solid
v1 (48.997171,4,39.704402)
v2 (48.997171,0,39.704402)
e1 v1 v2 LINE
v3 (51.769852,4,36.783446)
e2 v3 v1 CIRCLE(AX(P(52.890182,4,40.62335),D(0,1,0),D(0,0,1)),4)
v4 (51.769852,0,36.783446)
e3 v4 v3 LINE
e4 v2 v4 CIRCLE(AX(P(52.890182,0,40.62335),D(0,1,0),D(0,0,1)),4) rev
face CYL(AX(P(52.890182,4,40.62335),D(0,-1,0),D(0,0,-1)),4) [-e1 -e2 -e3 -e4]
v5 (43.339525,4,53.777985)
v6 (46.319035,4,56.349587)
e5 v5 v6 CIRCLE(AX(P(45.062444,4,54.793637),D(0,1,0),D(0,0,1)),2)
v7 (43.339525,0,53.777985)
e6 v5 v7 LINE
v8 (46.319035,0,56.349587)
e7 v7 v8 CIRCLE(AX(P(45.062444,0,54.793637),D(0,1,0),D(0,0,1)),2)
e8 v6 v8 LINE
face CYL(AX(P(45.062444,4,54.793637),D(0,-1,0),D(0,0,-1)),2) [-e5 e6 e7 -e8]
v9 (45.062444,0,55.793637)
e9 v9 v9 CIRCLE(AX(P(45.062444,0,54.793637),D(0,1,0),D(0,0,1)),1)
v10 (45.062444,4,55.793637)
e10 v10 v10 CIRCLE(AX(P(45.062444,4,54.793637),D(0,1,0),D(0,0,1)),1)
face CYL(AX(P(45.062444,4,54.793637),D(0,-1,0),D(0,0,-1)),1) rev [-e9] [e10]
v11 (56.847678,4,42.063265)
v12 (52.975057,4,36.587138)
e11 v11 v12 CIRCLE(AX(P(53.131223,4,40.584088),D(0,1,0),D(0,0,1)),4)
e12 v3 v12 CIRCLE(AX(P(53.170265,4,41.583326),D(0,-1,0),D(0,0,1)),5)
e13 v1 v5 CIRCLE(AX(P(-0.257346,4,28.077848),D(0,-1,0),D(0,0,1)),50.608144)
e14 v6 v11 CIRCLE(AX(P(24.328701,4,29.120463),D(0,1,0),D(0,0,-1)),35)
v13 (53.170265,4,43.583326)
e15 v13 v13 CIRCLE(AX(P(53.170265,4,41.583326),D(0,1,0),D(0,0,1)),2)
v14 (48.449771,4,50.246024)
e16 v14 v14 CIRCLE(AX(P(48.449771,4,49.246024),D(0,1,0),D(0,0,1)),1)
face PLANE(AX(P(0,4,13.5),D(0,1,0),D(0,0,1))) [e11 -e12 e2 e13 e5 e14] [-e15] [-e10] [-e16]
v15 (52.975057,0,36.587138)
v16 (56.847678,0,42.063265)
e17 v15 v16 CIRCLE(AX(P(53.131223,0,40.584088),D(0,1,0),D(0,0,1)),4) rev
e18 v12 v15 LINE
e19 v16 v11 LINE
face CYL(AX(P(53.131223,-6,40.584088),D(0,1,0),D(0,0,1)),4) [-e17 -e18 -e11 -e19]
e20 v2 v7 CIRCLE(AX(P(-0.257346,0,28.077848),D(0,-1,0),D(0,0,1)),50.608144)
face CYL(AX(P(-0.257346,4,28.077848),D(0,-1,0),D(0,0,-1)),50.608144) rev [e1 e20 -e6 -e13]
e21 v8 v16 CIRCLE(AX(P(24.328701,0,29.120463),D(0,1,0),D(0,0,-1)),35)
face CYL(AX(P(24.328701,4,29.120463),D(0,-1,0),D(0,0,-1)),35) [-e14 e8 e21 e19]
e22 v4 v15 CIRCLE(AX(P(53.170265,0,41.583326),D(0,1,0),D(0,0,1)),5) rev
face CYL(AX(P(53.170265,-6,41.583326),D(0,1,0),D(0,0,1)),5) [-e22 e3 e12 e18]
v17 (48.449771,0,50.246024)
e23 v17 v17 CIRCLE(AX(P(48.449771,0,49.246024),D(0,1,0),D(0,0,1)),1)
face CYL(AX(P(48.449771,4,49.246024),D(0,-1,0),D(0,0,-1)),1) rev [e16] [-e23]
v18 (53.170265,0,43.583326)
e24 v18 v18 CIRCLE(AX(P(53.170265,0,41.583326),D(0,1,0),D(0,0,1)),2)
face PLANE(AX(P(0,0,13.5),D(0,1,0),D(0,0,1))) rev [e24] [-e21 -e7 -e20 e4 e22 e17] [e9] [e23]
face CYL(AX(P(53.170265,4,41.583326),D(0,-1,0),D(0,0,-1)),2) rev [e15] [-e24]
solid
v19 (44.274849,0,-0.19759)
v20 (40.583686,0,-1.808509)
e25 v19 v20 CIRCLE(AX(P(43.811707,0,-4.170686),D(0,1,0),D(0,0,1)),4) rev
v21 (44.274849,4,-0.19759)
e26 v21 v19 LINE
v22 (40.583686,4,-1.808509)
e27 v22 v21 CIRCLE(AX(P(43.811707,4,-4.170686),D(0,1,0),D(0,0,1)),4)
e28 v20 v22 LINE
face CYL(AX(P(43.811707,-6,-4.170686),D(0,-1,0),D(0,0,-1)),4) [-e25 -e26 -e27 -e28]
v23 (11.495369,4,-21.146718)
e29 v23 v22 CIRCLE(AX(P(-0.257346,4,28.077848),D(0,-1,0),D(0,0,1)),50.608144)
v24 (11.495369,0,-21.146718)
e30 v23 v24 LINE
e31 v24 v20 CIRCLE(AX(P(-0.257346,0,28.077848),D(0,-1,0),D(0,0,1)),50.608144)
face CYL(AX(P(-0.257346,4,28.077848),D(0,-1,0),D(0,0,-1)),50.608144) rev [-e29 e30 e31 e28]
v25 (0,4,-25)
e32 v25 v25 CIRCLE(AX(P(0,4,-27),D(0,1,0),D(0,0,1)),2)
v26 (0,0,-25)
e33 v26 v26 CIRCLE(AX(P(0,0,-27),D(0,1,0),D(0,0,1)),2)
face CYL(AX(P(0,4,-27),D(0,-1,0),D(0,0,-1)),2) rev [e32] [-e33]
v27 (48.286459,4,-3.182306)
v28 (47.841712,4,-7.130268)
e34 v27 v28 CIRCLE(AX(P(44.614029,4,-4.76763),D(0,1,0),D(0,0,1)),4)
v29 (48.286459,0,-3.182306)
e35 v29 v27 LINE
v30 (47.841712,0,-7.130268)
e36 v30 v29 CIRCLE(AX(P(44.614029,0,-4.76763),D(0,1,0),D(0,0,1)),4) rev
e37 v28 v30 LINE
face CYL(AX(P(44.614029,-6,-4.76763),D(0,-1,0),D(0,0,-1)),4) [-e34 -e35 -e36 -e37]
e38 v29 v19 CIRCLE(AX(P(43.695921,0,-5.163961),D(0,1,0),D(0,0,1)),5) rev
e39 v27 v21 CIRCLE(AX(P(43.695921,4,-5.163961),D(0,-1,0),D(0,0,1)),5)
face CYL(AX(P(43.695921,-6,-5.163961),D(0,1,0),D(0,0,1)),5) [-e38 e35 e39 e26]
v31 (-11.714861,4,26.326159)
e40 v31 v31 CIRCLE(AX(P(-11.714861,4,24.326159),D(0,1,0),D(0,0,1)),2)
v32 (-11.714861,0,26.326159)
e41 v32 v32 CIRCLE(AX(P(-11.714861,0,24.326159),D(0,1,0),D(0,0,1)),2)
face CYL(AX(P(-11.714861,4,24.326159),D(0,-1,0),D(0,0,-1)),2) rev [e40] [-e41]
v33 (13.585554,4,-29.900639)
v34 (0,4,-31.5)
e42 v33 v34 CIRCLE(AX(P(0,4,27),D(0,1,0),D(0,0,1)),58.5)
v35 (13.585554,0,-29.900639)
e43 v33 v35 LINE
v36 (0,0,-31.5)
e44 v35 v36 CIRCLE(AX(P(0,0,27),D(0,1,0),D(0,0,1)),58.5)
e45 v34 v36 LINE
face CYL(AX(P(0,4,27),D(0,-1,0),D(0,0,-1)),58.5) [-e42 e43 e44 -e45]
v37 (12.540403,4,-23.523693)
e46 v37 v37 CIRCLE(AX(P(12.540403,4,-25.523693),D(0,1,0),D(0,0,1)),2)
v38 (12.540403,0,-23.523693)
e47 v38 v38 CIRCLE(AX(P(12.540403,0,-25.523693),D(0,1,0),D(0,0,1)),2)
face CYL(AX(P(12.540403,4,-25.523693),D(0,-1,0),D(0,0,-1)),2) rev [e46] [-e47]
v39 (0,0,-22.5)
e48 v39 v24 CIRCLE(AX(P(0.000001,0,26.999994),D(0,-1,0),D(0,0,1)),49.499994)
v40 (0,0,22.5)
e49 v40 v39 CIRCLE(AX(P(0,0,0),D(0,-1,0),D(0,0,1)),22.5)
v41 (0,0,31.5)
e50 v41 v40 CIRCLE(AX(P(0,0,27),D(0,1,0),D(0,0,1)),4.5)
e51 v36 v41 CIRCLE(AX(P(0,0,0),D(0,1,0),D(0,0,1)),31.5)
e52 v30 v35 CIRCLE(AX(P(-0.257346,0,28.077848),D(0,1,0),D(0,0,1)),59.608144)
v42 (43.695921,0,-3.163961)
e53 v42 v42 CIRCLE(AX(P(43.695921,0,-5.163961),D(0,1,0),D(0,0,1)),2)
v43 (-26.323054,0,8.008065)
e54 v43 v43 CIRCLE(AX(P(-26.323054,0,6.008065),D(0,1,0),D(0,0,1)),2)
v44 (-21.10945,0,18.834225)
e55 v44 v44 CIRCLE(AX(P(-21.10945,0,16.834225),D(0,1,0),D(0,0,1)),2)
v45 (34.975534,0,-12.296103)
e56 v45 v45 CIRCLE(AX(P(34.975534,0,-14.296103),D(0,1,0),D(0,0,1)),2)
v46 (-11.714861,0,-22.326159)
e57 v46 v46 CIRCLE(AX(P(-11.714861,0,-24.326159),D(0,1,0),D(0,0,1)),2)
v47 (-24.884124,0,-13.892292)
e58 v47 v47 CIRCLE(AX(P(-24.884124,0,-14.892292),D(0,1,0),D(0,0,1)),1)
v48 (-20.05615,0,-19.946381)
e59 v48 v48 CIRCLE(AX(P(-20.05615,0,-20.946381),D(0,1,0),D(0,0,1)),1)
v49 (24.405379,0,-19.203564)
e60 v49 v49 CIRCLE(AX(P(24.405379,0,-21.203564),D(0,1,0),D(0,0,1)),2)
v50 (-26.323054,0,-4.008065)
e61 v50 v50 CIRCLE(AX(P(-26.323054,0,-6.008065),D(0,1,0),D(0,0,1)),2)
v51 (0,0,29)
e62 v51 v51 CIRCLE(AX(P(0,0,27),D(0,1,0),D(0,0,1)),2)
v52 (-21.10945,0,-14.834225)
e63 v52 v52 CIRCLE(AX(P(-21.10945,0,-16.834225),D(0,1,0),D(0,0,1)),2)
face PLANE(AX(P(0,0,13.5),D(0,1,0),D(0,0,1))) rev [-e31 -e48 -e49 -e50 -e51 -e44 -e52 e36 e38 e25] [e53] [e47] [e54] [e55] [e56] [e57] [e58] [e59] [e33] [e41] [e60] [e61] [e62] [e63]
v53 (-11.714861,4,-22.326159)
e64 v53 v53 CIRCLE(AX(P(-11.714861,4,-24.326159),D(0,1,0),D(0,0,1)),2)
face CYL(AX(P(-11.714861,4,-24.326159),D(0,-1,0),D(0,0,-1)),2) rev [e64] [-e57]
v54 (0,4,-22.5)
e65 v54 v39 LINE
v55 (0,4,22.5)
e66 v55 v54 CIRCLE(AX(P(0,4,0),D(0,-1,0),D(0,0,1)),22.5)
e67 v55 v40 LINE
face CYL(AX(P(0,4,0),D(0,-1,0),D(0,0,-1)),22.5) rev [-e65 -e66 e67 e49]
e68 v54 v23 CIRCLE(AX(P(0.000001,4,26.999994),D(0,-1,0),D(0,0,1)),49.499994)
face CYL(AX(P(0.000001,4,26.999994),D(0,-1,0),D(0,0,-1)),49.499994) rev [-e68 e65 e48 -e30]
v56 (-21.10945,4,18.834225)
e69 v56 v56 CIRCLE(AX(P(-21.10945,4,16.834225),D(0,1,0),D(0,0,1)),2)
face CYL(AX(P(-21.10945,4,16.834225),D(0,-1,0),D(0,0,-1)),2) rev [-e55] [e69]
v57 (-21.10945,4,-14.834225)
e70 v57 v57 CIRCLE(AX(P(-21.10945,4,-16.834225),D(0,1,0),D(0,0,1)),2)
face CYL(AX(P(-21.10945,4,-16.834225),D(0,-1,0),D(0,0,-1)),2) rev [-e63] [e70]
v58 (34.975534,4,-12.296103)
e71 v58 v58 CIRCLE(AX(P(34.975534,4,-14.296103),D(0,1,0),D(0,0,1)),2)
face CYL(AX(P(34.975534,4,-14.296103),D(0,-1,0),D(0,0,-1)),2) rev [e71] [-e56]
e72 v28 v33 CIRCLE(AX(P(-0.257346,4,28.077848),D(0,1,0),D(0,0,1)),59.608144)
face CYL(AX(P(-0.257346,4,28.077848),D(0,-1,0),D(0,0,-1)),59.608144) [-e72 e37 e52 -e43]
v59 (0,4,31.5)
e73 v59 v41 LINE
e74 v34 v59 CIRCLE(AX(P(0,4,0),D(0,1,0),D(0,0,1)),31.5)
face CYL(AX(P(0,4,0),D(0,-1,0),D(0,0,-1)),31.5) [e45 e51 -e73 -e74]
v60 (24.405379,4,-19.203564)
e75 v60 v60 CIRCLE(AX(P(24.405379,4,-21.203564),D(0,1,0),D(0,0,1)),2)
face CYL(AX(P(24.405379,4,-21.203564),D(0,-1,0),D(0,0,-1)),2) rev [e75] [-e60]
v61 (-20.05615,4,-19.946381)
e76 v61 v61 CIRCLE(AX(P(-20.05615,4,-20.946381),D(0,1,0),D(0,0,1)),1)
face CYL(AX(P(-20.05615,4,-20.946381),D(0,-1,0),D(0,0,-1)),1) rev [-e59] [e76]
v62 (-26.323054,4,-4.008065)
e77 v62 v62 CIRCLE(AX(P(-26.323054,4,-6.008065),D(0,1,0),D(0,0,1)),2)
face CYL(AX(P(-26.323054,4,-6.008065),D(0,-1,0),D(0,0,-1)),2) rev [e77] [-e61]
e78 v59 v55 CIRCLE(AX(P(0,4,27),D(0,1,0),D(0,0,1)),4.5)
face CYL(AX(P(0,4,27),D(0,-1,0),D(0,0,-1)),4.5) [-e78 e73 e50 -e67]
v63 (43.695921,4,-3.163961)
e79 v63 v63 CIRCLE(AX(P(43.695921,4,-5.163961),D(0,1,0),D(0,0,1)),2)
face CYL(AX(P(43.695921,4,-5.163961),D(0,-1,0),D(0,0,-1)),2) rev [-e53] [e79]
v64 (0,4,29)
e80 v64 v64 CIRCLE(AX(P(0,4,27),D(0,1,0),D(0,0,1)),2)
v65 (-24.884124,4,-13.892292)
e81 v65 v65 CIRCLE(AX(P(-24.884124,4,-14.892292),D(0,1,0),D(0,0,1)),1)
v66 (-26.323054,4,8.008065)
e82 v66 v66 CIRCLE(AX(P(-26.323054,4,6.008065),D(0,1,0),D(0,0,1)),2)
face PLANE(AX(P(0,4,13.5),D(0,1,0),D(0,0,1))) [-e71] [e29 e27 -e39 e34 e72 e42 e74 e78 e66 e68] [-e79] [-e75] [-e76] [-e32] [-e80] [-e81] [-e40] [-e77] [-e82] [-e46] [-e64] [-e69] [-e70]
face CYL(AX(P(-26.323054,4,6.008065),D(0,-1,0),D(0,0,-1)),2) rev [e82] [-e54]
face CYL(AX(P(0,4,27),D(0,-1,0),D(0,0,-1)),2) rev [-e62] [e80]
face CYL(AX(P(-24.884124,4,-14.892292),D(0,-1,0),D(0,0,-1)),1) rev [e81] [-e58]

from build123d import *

# Parameters (mm, degrees)
EXTRUDE_2_OUTLINE_R   = 2
EXTRUDE_2_OUTLINE_R_2 = 1
EXTRUDE_2_DEPTH       = 4
CUT_EXTRUDE_START     = -10
CUT_EXTRUDE_3_DEPTH   = 10
FILLET_1_R            = 4
FILLET_2_R            = 4


with BuildPart() as part:
    # 凸台-拉伸2: read off the stored shape, not the designer's step
    # 凸台-拉伸2 outline → 凸台-拉伸2 (new body)
    with BuildSketch(Plane(origin=(0, 0, 0), x_dir=(1, 0, 0), z_dir=(0, 1, 0))):
        with BuildLine():
            ThreePointArc((0, -31.5), (4.5, -27), (0, -22.5))
            ThreePointArc((0, -22.5), (-22.5, 3.7e-08), (7.4e-08, 22.5))
            ThreePointArc((7.4e-08, 22.5), (5.787375943, 22.160515492), (11.49536899, 21.146718391))
            ThreePointArc((11.49536899, 21.146718391), (46.318634446, -8.282336699), (43.339524989, -53.777984924))
            ThreePointArc((43.339524989, -53.777984924), (43.755673323, -56.307687994), (46.319034695, -56.349587119))
            ThreePointArc((46.319034695, -56.349587119), (55.582439452, -44.874948294), (59.297272191, -30.603367387))
            ThreePointArc((59.297272191, -30.603367387), (47.302958929, 7.854702908), (13.58555366, 29.900639116))
            ThreePointArc((13.58555366, 29.900639116), (6.839686095, 31.09878393), (0, 31.5))
            ThreePointArc((0, 31.5), (-31.5, 0), (0, -31.5))
        make_face()
        with Locations((-11.714860956, -24.326159433)):
            Circle(EXTRUDE_2_OUTLINE_R, mode=Mode.SUBTRACT)
        with Locations((-21.109450027, -16.83422465)):
            Circle(EXTRUDE_2_OUTLINE_R, mode=Mode.SUBTRACT)
        with Locations((0, -27)):
            Circle(EXTRUDE_2_OUTLINE_R, mode=Mode.SUBTRACT)
        with Locations((45.062444179, -54.793637159)):
            Circle(EXTRUDE_2_OUTLINE_R_2, mode=Mode.SUBTRACT)
        with Locations((48.449771136, -49.246023611)):
            Circle(EXTRUDE_2_OUTLINE_R_2, mode=Mode.SUBTRACT)
        with Locations((53.170264587, -41.583325549)):
            Circle(EXTRUDE_2_OUTLINE_R, mode=Mode.SUBTRACT)
        with Locations((54.835170241, -29.39015795)):
            Circle(EXTRUDE_2_OUTLINE_R, mode=Mode.SUBTRACT)
        with Locations((53.752708813, -17.131547744)):
            Circle(EXTRUDE_2_OUTLINE_R, mode=Mode.SUBTRACT)
        with Locations((-26.323053629, -6.008065217)):
            Circle(EXTRUDE_2_OUTLINE_R, mode=Mode.SUBTRACT)
        with Locations((-26.323053629, 6.008065217)):
            Circle(EXTRUDE_2_OUTLINE_R, mode=Mode.SUBTRACT)
        with Locations((-24.884124338, 14.892291829)):
            Circle(EXTRUDE_2_OUTLINE_R_2, mode=Mode.SUBTRACT)
        with Locations((-21.109450027, 16.83422465)):
            Circle(EXTRUDE_2_OUTLINE_R, mode=Mode.SUBTRACT)
        with Locations((-20.056149569, 20.946380701)):
            Circle(EXTRUDE_2_OUTLINE_R_2, mode=Mode.SUBTRACT)
        with Locations((-11.714860956, 24.326159433)):
            Circle(EXTRUDE_2_OUTLINE_R, mode=Mode.SUBTRACT)
        with Locations((0, 27)):
            Circle(EXTRUDE_2_OUTLINE_R, mode=Mode.SUBTRACT)
        with Locations((12.540402592, 25.523692776)):
            Circle(EXTRUDE_2_OUTLINE_R, mode=Mode.SUBTRACT)
        with Locations((49.976860752, -5.418810304)):
            Circle(EXTRUDE_2_OUTLINE_R, mode=Mode.SUBTRACT)
        with Locations((43.695920975, 5.163960715)):
            Circle(EXTRUDE_2_OUTLINE_R, mode=Mode.SUBTRACT)
        with Locations((34.975533575, 14.296103059)):
            Circle(EXTRUDE_2_OUTLINE_R, mode=Mode.SUBTRACT)
        with Locations((24.405378973, 21.203563653)):
            Circle(EXTRUDE_2_OUTLINE_R, mode=Mode.SUBTRACT)
    extrude(amount=EXTRUDE_2_DEPTH)

    # 草图8 → 切除-拉伸3 (cut)
    with BuildSketch(Plane(origin=(0, 4, 0), x_dir=(1, 0, 0), z_dir=(0, 1, 0)).offset(CUT_EXTRUDE_START)):
        with BuildLine():
            ThreePointArc((41.332007484, 0.758065459), (46.632458464, 1.117141276), (48.617709435, 6.044868402))
            ThreePointArc((48.617709435, 6.044868402), (56.970460411, -11.401248213), (59.297272191, -30.603367387))
            ThreePointArc((59.297272191, -30.603367387), (58.809304177, -35.127790179), (57.738444676, -39.550659644))
            ThreePointArc((57.738444676, -39.550659644), (53.817860097, -36.625440914), (49.277451804, -38.445490526))
            ThreePointArc((49.277451804, -38.445490526), (49.342376142, -18.025396576), (41.332007484, 0.758065459))
        make_face()
    extrude(amount=CUT_EXTRUDE_3_DEPTH, mode=Mode.SUBTRACT)


with BuildPart() as cut_extrude_3_piece_1:
    # of the separate pieces the step leaves, piece 1, a body of its own (cut_extrude_3_pieces)
    add(part.part.solids().sort_by_distance((0, 0, -31.5))[0])

    # 圆角1
    fillet_1_edges = [cut_extrude_3_piece_1.edges().sort_by_distance(p)[0] for p in [
        (48.617709435, 2, -6.044868402),
        (41.332007484, 2, -0.758065459),
    ]]
    fillet(fillet_1_edges, radius=FILLET_1_R)


with BuildPart() as cut_extrude_3_piece_2:
    # of the separate pieces the step leaves, piece 2, a body of its own (cut_extrude_3_pieces)
    add(part.part.solids().sort_by_distance((46.319034695, 0, 56.349587119))[0])

    # 圆角2
    # the kernel refuses this fillet: 4 mm, written as the material it takes off along each edge
    with BuildSketch(Plane(origin=(57.738444676, -14.025049708, 39.550659644), x_dir=(-0.3341423886783104, 0, 0.942522606672303), z_dir=(0, 1, 0))) as fillet_2_piece_1:
        with BuildLine():
            CenterArc((2.513497567, -3.997098273), FILLET_2_R, 87.817460056, 113.940415857)
            ThreePointArc((-1.201536862, -5.479838708), (-1.441718234, -2.555528491), (0, 0))
            ThreePointArc((0, 0), (1.332915376, 0.025390115), (2.665830753, 0))
        make_face()
    extrude(amount=32.050099416, mode=Mode.SUBTRACT)
    with BuildSketch(Plane(origin=(49.277451804, -7.489347392, 38.445490526), x_dir=(-0.21731663621924255, 0, 0.9761011625965585), z_dir=(0, 1, 0))) as fillet_2_piece_2:
        with BuildLine():
            CenterArc((1.340704391, 3.999675251), FILLET_2_R, 208.816602823, 60.45329366)
            ThreePointArc((-2.163963783, 2.071644912), (-1.240781155, 0.869946609), (0, 0))
            ThreePointArc((0, 0), (0.644867465, 0.004108735), (1.28973493, 0))
        make_face()
    extrude(amount=18.978694783, mode=Mode.SUBTRACT)


solid = Compound([cut_extrude_3_piece_1.part, cut_extrude_3_piece_2.part])
